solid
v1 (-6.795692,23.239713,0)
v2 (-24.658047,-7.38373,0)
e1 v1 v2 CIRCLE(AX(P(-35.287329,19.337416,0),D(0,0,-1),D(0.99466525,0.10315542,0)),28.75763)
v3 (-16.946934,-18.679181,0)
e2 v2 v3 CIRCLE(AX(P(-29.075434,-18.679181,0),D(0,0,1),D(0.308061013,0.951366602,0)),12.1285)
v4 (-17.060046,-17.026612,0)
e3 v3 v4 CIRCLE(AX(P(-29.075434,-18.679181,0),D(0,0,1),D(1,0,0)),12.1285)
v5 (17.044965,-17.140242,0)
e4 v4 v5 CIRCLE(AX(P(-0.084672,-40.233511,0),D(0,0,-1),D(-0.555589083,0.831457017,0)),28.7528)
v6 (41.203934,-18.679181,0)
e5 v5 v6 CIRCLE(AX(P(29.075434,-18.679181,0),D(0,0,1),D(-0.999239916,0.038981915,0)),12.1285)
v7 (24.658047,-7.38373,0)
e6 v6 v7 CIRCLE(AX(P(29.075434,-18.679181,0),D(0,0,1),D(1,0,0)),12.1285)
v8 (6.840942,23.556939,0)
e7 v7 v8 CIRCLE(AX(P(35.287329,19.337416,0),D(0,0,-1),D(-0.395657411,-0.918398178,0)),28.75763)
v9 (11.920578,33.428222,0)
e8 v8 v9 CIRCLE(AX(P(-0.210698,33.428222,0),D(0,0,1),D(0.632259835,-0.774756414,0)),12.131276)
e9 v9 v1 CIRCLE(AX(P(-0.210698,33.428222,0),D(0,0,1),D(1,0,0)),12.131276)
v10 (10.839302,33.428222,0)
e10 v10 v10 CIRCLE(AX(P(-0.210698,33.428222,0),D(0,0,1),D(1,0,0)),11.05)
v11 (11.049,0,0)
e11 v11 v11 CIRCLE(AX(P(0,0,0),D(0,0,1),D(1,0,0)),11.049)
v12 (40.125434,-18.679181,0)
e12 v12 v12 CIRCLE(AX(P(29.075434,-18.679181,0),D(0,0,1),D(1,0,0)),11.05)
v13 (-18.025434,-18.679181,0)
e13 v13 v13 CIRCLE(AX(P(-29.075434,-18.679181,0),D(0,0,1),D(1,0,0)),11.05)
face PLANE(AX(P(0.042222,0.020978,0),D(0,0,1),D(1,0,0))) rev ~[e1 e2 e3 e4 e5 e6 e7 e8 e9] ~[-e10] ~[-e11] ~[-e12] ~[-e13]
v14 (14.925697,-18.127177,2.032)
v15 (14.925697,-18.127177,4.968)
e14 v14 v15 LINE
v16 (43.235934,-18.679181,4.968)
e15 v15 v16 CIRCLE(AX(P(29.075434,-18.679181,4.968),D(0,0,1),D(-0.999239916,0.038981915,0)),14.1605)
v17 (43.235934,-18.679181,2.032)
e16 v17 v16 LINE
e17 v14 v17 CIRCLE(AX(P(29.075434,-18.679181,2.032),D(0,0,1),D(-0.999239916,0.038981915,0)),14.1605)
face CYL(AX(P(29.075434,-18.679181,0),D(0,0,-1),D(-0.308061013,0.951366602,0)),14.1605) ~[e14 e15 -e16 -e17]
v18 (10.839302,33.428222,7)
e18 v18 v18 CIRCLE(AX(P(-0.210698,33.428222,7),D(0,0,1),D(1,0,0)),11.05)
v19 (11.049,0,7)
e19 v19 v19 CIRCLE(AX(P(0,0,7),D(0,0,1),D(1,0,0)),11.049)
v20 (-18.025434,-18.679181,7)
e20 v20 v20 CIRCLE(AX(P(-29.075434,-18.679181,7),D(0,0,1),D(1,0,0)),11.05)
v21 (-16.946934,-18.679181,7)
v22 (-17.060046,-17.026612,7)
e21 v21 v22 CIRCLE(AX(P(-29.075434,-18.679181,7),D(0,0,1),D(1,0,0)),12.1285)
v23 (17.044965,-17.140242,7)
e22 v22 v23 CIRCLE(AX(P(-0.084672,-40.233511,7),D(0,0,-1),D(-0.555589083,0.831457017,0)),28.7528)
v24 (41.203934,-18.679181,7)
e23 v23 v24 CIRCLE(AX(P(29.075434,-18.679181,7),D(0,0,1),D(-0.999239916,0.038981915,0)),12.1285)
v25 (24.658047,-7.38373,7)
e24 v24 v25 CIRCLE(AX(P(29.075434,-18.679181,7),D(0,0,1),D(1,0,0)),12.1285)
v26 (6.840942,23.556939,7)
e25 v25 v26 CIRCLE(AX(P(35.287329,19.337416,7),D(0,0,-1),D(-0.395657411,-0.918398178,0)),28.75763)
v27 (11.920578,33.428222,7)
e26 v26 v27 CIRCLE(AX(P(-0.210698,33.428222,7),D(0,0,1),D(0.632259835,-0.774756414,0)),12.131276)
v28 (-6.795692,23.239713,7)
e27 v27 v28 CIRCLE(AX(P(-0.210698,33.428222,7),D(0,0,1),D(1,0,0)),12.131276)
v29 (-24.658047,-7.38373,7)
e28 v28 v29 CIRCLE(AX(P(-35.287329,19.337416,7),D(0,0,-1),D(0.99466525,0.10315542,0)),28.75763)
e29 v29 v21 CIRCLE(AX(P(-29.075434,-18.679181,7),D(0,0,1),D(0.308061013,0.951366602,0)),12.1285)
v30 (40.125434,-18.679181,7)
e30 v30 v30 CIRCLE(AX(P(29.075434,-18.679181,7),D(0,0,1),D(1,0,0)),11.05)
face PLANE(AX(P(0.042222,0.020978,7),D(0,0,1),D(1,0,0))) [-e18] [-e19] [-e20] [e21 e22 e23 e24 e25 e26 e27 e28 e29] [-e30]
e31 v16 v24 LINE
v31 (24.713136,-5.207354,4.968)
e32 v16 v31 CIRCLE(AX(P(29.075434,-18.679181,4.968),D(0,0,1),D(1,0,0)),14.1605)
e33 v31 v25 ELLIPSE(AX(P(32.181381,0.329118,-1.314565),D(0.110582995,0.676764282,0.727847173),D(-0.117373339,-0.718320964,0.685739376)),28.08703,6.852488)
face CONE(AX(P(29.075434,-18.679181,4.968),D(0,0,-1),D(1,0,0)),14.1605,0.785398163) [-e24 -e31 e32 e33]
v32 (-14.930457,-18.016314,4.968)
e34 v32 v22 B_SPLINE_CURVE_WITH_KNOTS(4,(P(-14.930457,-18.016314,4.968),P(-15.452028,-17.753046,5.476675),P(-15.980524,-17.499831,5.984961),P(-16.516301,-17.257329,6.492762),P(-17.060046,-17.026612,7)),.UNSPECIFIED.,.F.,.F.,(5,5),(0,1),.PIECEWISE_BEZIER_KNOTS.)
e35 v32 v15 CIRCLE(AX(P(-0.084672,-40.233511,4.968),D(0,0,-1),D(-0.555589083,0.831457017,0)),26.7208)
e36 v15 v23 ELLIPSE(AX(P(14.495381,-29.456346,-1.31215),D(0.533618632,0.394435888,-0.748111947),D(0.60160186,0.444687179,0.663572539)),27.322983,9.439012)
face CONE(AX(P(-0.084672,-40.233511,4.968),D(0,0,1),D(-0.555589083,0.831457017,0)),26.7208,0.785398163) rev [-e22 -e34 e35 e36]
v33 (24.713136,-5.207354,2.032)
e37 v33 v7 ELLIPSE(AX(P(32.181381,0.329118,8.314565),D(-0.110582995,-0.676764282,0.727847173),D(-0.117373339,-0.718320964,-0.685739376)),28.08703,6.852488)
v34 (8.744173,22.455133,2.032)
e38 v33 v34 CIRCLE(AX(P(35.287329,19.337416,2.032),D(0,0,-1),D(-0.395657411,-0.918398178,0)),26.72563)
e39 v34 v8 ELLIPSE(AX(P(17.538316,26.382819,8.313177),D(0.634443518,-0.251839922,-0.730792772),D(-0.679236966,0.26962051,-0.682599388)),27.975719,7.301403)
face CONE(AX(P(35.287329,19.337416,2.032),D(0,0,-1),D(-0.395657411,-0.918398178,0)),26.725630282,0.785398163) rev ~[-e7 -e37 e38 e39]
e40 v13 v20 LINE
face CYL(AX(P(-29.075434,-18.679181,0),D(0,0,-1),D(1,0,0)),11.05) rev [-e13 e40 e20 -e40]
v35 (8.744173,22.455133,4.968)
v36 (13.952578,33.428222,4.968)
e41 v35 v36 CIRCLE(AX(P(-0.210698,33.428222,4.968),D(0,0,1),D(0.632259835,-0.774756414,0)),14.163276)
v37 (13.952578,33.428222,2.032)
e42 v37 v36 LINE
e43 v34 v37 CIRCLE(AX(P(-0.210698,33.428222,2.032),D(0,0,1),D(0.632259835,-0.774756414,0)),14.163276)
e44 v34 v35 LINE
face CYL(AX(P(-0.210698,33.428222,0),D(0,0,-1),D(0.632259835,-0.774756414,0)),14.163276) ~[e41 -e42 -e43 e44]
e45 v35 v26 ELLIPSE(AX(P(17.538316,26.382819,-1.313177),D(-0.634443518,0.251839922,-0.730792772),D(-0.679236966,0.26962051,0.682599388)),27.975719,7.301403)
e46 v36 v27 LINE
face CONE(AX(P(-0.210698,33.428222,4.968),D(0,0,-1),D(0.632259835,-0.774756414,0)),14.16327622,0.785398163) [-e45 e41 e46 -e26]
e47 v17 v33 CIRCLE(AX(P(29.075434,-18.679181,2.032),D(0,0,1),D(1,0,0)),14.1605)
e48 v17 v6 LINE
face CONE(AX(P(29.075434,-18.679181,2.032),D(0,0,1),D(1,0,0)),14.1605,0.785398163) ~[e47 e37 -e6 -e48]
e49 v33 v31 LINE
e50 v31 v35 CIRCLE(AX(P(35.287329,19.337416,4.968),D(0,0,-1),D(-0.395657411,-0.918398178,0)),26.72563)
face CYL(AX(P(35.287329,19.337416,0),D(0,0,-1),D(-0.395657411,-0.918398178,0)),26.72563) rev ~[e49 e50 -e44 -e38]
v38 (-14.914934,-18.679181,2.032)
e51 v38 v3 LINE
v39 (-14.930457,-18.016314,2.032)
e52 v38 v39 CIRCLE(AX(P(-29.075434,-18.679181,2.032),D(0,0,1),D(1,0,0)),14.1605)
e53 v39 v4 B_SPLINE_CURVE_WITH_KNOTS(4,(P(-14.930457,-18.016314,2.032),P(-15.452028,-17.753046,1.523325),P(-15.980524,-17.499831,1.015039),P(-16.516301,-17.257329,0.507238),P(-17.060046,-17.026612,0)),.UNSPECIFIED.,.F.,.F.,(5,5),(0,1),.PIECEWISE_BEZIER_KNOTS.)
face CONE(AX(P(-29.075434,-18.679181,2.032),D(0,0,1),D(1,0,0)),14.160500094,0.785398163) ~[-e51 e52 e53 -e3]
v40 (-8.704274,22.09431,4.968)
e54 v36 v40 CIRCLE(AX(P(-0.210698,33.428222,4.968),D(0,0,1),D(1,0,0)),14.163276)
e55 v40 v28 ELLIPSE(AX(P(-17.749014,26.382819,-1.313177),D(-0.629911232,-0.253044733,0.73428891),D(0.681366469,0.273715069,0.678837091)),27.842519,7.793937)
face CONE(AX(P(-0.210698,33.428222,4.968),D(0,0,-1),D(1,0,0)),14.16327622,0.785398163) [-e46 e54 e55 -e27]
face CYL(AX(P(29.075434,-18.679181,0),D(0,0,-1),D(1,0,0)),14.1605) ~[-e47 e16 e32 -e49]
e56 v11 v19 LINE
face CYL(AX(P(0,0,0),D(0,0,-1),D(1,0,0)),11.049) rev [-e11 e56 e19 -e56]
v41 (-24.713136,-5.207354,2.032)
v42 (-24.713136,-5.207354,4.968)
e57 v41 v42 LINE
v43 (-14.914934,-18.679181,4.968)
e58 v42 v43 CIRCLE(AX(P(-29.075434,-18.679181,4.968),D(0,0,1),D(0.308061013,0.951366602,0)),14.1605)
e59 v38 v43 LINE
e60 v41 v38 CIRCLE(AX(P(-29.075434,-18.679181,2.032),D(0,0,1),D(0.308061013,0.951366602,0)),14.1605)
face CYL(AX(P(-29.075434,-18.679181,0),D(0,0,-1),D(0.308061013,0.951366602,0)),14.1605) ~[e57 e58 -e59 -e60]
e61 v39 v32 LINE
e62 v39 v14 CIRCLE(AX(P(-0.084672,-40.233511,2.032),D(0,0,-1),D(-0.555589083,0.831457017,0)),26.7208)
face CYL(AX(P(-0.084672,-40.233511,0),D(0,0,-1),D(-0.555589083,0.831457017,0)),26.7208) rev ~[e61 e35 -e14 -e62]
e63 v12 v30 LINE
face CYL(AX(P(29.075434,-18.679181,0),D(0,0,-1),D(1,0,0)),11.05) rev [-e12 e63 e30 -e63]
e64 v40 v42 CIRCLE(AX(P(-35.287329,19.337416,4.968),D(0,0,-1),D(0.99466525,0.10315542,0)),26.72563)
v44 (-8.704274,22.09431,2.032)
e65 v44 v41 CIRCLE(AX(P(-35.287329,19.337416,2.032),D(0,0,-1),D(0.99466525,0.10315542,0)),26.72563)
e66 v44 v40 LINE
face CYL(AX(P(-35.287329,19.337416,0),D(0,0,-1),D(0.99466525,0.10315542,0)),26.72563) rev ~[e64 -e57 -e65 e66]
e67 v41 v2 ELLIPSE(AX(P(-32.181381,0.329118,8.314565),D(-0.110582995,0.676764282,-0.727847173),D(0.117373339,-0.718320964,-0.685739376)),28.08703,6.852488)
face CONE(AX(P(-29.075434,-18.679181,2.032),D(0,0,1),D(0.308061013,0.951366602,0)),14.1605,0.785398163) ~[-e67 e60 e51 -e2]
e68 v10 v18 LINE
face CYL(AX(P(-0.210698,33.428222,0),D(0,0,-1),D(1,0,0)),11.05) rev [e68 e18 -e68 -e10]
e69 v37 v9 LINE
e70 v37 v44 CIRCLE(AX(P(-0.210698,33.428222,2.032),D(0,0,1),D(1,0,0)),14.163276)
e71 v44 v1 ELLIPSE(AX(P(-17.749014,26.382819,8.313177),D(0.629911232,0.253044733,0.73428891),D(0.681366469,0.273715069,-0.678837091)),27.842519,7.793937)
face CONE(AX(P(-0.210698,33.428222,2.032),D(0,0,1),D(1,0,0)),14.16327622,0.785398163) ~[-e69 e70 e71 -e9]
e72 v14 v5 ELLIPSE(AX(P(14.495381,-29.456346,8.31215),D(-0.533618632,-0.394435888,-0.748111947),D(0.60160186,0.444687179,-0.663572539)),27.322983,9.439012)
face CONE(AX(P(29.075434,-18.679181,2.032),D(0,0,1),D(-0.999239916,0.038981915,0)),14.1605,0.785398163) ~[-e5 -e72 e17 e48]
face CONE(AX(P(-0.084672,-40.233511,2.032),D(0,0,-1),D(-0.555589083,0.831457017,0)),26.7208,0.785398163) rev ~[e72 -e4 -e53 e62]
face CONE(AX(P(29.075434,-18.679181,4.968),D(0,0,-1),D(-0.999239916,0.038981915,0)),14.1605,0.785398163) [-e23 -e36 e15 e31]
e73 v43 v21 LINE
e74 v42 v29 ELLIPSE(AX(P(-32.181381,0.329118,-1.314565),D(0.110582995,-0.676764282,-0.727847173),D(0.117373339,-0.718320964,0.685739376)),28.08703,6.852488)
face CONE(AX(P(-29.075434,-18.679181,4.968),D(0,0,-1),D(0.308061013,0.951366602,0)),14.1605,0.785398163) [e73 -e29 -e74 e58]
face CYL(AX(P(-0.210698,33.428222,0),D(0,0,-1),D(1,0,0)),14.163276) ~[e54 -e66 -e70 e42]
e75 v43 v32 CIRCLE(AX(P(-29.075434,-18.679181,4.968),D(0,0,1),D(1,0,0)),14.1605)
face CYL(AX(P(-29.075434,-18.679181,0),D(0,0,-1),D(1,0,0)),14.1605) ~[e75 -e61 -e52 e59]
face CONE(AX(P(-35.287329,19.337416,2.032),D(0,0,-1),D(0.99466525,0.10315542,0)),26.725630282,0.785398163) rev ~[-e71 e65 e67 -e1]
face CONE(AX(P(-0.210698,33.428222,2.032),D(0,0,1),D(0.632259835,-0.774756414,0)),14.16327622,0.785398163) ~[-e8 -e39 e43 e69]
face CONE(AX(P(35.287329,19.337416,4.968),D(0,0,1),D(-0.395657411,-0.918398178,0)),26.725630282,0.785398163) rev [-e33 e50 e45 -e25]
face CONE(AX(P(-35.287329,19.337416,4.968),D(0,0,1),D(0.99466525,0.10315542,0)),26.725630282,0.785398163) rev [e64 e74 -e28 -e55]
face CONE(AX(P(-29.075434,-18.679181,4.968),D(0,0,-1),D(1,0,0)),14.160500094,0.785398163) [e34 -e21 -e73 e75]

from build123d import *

# Parameters (mm, degrees)
F0_R     = 11.049
F0_R_2   = 11.05
F1_DEPTH = 7
F2_SIZE  = 2.032


# Not quite as in the source:
# - a feature names something its author has since deleted; it is built from what else it names


with BuildPart() as f1:
    # F0 (on Top) → F1 (new body)
    with BuildSketch(Plane.XY):
        with BuildLine():
            ThreePointArc((-8.7042735718, 22.0943097642), (-12.2328176499, 5.8189544339), (-24.7131356106, -5.2073540163))
            ThreePointArc((-24.7131356106, -5.2073540163), (-17.821671092, -10.084264276), (-14.930456808, -18.0163142542))
            ThreePointArc((-14.930456808, -18.0163142542), (0.0145480917, -13.5128951169), (14.9256967567, -18.1271773868))
            ThreePointArc((14.9256967567, -18.1271773868), (17.7880815001, -10.1284239204), (24.7131356106, -5.2073540163))
            ThreePointArc((24.7131356106, -5.2073540163), (12.1415366781, 5.9758444424), (8.7441728022, 22.4551328426))
            ThreePointArc((8.7441728022, 22.4551328426), (0.0821273079, 19.2679731194), (-8.7042735718, 22.0943097642))
        make_face()
        Circle(F0_R, mode=Mode.SUBTRACT)
        with BuildLine():
            ThreePointArc((-14.930456808, -18.0163142542), (-17.821671092, -10.084264276), (-24.7131356106, -5.2073540163))
            ThreePointArc((-24.7131356106, -5.2073540163), (-40.5273347614, -27.0082695647), (-14.9149335915, -18.6791807883))
            ThreePointArc((-14.9149335915, -18.6791807883), (-14.9188149276, -18.3476566518), (-14.930456808, -18.0163142542))
        make_face()
        with Locations((-29.0754335915, -18.6791807883)):
            Circle(F0_R_2, mode=Mode.SUBTRACT)
        with BuildLine():
            ThreePointArc((13.9525783408, 33.428221941), (-6.5471611927, 46.095014193), (-8.7042735718, 22.0943097642))
            ThreePointArc((-8.7042735718, 22.0943097642), (0.0821273079, 19.2679731194), (8.7441728022, 22.4551328426))
            ThreePointArc((8.7441728022, 22.4551328426), (12.5843929813, 27.3549984844), (13.9525783408, 33.428221941))
        make_face()
        with Locations((-0.2106978791, 33.428221941)):
            Circle(F0_R_2, mode=Mode.SUBTRACT)
        with BuildLine():
            ThreePointArc((24.7131356106, -5.2073540163), (17.7880815001, -10.1284239204), (14.9256967567, -18.1271773868))
            ThreePointArc((14.9256967567, -18.1271773868), (28.7993794297, -32.8369897413), (43.2359335915, -18.6791807883))
            ThreePointArc((43.2359335915, -18.6791807883), (37.404522368, -7.2272796184), (24.7131356106, -5.2073540163))
        make_face()
        with Locations((29.0754335915, -18.6791807883)):
            Circle(F0_R_2, mode=Mode.SUBTRACT)
    extrude(amount=F1_DEPTH)

    # F2
    f2_edges = [f1.edges().sort_by_distance(p)[0] for p in [
        (-12.232818, 5.818954, 7),
        (12.141537, 5.975844, 7),
        (0.014548, -13.512895, 7),
        (0.014548, -13.512895, 0),
        (12.141537, 5.975844, 0),
        (-12.232818, 5.818954, 0),
        (-40.329196, -27.274097, 0),
        (40.362786, -27.229938, 0),
        (-0.503523, 47.588471, 0),
        (-40.329196, -27.274097, 7),
        (40.362786, -27.229938, 7),
        (-0.503523, 47.588471, 7),
    ]]
    chamfer(f2_edges, length=F2_SIZE)


solid = f1.part
